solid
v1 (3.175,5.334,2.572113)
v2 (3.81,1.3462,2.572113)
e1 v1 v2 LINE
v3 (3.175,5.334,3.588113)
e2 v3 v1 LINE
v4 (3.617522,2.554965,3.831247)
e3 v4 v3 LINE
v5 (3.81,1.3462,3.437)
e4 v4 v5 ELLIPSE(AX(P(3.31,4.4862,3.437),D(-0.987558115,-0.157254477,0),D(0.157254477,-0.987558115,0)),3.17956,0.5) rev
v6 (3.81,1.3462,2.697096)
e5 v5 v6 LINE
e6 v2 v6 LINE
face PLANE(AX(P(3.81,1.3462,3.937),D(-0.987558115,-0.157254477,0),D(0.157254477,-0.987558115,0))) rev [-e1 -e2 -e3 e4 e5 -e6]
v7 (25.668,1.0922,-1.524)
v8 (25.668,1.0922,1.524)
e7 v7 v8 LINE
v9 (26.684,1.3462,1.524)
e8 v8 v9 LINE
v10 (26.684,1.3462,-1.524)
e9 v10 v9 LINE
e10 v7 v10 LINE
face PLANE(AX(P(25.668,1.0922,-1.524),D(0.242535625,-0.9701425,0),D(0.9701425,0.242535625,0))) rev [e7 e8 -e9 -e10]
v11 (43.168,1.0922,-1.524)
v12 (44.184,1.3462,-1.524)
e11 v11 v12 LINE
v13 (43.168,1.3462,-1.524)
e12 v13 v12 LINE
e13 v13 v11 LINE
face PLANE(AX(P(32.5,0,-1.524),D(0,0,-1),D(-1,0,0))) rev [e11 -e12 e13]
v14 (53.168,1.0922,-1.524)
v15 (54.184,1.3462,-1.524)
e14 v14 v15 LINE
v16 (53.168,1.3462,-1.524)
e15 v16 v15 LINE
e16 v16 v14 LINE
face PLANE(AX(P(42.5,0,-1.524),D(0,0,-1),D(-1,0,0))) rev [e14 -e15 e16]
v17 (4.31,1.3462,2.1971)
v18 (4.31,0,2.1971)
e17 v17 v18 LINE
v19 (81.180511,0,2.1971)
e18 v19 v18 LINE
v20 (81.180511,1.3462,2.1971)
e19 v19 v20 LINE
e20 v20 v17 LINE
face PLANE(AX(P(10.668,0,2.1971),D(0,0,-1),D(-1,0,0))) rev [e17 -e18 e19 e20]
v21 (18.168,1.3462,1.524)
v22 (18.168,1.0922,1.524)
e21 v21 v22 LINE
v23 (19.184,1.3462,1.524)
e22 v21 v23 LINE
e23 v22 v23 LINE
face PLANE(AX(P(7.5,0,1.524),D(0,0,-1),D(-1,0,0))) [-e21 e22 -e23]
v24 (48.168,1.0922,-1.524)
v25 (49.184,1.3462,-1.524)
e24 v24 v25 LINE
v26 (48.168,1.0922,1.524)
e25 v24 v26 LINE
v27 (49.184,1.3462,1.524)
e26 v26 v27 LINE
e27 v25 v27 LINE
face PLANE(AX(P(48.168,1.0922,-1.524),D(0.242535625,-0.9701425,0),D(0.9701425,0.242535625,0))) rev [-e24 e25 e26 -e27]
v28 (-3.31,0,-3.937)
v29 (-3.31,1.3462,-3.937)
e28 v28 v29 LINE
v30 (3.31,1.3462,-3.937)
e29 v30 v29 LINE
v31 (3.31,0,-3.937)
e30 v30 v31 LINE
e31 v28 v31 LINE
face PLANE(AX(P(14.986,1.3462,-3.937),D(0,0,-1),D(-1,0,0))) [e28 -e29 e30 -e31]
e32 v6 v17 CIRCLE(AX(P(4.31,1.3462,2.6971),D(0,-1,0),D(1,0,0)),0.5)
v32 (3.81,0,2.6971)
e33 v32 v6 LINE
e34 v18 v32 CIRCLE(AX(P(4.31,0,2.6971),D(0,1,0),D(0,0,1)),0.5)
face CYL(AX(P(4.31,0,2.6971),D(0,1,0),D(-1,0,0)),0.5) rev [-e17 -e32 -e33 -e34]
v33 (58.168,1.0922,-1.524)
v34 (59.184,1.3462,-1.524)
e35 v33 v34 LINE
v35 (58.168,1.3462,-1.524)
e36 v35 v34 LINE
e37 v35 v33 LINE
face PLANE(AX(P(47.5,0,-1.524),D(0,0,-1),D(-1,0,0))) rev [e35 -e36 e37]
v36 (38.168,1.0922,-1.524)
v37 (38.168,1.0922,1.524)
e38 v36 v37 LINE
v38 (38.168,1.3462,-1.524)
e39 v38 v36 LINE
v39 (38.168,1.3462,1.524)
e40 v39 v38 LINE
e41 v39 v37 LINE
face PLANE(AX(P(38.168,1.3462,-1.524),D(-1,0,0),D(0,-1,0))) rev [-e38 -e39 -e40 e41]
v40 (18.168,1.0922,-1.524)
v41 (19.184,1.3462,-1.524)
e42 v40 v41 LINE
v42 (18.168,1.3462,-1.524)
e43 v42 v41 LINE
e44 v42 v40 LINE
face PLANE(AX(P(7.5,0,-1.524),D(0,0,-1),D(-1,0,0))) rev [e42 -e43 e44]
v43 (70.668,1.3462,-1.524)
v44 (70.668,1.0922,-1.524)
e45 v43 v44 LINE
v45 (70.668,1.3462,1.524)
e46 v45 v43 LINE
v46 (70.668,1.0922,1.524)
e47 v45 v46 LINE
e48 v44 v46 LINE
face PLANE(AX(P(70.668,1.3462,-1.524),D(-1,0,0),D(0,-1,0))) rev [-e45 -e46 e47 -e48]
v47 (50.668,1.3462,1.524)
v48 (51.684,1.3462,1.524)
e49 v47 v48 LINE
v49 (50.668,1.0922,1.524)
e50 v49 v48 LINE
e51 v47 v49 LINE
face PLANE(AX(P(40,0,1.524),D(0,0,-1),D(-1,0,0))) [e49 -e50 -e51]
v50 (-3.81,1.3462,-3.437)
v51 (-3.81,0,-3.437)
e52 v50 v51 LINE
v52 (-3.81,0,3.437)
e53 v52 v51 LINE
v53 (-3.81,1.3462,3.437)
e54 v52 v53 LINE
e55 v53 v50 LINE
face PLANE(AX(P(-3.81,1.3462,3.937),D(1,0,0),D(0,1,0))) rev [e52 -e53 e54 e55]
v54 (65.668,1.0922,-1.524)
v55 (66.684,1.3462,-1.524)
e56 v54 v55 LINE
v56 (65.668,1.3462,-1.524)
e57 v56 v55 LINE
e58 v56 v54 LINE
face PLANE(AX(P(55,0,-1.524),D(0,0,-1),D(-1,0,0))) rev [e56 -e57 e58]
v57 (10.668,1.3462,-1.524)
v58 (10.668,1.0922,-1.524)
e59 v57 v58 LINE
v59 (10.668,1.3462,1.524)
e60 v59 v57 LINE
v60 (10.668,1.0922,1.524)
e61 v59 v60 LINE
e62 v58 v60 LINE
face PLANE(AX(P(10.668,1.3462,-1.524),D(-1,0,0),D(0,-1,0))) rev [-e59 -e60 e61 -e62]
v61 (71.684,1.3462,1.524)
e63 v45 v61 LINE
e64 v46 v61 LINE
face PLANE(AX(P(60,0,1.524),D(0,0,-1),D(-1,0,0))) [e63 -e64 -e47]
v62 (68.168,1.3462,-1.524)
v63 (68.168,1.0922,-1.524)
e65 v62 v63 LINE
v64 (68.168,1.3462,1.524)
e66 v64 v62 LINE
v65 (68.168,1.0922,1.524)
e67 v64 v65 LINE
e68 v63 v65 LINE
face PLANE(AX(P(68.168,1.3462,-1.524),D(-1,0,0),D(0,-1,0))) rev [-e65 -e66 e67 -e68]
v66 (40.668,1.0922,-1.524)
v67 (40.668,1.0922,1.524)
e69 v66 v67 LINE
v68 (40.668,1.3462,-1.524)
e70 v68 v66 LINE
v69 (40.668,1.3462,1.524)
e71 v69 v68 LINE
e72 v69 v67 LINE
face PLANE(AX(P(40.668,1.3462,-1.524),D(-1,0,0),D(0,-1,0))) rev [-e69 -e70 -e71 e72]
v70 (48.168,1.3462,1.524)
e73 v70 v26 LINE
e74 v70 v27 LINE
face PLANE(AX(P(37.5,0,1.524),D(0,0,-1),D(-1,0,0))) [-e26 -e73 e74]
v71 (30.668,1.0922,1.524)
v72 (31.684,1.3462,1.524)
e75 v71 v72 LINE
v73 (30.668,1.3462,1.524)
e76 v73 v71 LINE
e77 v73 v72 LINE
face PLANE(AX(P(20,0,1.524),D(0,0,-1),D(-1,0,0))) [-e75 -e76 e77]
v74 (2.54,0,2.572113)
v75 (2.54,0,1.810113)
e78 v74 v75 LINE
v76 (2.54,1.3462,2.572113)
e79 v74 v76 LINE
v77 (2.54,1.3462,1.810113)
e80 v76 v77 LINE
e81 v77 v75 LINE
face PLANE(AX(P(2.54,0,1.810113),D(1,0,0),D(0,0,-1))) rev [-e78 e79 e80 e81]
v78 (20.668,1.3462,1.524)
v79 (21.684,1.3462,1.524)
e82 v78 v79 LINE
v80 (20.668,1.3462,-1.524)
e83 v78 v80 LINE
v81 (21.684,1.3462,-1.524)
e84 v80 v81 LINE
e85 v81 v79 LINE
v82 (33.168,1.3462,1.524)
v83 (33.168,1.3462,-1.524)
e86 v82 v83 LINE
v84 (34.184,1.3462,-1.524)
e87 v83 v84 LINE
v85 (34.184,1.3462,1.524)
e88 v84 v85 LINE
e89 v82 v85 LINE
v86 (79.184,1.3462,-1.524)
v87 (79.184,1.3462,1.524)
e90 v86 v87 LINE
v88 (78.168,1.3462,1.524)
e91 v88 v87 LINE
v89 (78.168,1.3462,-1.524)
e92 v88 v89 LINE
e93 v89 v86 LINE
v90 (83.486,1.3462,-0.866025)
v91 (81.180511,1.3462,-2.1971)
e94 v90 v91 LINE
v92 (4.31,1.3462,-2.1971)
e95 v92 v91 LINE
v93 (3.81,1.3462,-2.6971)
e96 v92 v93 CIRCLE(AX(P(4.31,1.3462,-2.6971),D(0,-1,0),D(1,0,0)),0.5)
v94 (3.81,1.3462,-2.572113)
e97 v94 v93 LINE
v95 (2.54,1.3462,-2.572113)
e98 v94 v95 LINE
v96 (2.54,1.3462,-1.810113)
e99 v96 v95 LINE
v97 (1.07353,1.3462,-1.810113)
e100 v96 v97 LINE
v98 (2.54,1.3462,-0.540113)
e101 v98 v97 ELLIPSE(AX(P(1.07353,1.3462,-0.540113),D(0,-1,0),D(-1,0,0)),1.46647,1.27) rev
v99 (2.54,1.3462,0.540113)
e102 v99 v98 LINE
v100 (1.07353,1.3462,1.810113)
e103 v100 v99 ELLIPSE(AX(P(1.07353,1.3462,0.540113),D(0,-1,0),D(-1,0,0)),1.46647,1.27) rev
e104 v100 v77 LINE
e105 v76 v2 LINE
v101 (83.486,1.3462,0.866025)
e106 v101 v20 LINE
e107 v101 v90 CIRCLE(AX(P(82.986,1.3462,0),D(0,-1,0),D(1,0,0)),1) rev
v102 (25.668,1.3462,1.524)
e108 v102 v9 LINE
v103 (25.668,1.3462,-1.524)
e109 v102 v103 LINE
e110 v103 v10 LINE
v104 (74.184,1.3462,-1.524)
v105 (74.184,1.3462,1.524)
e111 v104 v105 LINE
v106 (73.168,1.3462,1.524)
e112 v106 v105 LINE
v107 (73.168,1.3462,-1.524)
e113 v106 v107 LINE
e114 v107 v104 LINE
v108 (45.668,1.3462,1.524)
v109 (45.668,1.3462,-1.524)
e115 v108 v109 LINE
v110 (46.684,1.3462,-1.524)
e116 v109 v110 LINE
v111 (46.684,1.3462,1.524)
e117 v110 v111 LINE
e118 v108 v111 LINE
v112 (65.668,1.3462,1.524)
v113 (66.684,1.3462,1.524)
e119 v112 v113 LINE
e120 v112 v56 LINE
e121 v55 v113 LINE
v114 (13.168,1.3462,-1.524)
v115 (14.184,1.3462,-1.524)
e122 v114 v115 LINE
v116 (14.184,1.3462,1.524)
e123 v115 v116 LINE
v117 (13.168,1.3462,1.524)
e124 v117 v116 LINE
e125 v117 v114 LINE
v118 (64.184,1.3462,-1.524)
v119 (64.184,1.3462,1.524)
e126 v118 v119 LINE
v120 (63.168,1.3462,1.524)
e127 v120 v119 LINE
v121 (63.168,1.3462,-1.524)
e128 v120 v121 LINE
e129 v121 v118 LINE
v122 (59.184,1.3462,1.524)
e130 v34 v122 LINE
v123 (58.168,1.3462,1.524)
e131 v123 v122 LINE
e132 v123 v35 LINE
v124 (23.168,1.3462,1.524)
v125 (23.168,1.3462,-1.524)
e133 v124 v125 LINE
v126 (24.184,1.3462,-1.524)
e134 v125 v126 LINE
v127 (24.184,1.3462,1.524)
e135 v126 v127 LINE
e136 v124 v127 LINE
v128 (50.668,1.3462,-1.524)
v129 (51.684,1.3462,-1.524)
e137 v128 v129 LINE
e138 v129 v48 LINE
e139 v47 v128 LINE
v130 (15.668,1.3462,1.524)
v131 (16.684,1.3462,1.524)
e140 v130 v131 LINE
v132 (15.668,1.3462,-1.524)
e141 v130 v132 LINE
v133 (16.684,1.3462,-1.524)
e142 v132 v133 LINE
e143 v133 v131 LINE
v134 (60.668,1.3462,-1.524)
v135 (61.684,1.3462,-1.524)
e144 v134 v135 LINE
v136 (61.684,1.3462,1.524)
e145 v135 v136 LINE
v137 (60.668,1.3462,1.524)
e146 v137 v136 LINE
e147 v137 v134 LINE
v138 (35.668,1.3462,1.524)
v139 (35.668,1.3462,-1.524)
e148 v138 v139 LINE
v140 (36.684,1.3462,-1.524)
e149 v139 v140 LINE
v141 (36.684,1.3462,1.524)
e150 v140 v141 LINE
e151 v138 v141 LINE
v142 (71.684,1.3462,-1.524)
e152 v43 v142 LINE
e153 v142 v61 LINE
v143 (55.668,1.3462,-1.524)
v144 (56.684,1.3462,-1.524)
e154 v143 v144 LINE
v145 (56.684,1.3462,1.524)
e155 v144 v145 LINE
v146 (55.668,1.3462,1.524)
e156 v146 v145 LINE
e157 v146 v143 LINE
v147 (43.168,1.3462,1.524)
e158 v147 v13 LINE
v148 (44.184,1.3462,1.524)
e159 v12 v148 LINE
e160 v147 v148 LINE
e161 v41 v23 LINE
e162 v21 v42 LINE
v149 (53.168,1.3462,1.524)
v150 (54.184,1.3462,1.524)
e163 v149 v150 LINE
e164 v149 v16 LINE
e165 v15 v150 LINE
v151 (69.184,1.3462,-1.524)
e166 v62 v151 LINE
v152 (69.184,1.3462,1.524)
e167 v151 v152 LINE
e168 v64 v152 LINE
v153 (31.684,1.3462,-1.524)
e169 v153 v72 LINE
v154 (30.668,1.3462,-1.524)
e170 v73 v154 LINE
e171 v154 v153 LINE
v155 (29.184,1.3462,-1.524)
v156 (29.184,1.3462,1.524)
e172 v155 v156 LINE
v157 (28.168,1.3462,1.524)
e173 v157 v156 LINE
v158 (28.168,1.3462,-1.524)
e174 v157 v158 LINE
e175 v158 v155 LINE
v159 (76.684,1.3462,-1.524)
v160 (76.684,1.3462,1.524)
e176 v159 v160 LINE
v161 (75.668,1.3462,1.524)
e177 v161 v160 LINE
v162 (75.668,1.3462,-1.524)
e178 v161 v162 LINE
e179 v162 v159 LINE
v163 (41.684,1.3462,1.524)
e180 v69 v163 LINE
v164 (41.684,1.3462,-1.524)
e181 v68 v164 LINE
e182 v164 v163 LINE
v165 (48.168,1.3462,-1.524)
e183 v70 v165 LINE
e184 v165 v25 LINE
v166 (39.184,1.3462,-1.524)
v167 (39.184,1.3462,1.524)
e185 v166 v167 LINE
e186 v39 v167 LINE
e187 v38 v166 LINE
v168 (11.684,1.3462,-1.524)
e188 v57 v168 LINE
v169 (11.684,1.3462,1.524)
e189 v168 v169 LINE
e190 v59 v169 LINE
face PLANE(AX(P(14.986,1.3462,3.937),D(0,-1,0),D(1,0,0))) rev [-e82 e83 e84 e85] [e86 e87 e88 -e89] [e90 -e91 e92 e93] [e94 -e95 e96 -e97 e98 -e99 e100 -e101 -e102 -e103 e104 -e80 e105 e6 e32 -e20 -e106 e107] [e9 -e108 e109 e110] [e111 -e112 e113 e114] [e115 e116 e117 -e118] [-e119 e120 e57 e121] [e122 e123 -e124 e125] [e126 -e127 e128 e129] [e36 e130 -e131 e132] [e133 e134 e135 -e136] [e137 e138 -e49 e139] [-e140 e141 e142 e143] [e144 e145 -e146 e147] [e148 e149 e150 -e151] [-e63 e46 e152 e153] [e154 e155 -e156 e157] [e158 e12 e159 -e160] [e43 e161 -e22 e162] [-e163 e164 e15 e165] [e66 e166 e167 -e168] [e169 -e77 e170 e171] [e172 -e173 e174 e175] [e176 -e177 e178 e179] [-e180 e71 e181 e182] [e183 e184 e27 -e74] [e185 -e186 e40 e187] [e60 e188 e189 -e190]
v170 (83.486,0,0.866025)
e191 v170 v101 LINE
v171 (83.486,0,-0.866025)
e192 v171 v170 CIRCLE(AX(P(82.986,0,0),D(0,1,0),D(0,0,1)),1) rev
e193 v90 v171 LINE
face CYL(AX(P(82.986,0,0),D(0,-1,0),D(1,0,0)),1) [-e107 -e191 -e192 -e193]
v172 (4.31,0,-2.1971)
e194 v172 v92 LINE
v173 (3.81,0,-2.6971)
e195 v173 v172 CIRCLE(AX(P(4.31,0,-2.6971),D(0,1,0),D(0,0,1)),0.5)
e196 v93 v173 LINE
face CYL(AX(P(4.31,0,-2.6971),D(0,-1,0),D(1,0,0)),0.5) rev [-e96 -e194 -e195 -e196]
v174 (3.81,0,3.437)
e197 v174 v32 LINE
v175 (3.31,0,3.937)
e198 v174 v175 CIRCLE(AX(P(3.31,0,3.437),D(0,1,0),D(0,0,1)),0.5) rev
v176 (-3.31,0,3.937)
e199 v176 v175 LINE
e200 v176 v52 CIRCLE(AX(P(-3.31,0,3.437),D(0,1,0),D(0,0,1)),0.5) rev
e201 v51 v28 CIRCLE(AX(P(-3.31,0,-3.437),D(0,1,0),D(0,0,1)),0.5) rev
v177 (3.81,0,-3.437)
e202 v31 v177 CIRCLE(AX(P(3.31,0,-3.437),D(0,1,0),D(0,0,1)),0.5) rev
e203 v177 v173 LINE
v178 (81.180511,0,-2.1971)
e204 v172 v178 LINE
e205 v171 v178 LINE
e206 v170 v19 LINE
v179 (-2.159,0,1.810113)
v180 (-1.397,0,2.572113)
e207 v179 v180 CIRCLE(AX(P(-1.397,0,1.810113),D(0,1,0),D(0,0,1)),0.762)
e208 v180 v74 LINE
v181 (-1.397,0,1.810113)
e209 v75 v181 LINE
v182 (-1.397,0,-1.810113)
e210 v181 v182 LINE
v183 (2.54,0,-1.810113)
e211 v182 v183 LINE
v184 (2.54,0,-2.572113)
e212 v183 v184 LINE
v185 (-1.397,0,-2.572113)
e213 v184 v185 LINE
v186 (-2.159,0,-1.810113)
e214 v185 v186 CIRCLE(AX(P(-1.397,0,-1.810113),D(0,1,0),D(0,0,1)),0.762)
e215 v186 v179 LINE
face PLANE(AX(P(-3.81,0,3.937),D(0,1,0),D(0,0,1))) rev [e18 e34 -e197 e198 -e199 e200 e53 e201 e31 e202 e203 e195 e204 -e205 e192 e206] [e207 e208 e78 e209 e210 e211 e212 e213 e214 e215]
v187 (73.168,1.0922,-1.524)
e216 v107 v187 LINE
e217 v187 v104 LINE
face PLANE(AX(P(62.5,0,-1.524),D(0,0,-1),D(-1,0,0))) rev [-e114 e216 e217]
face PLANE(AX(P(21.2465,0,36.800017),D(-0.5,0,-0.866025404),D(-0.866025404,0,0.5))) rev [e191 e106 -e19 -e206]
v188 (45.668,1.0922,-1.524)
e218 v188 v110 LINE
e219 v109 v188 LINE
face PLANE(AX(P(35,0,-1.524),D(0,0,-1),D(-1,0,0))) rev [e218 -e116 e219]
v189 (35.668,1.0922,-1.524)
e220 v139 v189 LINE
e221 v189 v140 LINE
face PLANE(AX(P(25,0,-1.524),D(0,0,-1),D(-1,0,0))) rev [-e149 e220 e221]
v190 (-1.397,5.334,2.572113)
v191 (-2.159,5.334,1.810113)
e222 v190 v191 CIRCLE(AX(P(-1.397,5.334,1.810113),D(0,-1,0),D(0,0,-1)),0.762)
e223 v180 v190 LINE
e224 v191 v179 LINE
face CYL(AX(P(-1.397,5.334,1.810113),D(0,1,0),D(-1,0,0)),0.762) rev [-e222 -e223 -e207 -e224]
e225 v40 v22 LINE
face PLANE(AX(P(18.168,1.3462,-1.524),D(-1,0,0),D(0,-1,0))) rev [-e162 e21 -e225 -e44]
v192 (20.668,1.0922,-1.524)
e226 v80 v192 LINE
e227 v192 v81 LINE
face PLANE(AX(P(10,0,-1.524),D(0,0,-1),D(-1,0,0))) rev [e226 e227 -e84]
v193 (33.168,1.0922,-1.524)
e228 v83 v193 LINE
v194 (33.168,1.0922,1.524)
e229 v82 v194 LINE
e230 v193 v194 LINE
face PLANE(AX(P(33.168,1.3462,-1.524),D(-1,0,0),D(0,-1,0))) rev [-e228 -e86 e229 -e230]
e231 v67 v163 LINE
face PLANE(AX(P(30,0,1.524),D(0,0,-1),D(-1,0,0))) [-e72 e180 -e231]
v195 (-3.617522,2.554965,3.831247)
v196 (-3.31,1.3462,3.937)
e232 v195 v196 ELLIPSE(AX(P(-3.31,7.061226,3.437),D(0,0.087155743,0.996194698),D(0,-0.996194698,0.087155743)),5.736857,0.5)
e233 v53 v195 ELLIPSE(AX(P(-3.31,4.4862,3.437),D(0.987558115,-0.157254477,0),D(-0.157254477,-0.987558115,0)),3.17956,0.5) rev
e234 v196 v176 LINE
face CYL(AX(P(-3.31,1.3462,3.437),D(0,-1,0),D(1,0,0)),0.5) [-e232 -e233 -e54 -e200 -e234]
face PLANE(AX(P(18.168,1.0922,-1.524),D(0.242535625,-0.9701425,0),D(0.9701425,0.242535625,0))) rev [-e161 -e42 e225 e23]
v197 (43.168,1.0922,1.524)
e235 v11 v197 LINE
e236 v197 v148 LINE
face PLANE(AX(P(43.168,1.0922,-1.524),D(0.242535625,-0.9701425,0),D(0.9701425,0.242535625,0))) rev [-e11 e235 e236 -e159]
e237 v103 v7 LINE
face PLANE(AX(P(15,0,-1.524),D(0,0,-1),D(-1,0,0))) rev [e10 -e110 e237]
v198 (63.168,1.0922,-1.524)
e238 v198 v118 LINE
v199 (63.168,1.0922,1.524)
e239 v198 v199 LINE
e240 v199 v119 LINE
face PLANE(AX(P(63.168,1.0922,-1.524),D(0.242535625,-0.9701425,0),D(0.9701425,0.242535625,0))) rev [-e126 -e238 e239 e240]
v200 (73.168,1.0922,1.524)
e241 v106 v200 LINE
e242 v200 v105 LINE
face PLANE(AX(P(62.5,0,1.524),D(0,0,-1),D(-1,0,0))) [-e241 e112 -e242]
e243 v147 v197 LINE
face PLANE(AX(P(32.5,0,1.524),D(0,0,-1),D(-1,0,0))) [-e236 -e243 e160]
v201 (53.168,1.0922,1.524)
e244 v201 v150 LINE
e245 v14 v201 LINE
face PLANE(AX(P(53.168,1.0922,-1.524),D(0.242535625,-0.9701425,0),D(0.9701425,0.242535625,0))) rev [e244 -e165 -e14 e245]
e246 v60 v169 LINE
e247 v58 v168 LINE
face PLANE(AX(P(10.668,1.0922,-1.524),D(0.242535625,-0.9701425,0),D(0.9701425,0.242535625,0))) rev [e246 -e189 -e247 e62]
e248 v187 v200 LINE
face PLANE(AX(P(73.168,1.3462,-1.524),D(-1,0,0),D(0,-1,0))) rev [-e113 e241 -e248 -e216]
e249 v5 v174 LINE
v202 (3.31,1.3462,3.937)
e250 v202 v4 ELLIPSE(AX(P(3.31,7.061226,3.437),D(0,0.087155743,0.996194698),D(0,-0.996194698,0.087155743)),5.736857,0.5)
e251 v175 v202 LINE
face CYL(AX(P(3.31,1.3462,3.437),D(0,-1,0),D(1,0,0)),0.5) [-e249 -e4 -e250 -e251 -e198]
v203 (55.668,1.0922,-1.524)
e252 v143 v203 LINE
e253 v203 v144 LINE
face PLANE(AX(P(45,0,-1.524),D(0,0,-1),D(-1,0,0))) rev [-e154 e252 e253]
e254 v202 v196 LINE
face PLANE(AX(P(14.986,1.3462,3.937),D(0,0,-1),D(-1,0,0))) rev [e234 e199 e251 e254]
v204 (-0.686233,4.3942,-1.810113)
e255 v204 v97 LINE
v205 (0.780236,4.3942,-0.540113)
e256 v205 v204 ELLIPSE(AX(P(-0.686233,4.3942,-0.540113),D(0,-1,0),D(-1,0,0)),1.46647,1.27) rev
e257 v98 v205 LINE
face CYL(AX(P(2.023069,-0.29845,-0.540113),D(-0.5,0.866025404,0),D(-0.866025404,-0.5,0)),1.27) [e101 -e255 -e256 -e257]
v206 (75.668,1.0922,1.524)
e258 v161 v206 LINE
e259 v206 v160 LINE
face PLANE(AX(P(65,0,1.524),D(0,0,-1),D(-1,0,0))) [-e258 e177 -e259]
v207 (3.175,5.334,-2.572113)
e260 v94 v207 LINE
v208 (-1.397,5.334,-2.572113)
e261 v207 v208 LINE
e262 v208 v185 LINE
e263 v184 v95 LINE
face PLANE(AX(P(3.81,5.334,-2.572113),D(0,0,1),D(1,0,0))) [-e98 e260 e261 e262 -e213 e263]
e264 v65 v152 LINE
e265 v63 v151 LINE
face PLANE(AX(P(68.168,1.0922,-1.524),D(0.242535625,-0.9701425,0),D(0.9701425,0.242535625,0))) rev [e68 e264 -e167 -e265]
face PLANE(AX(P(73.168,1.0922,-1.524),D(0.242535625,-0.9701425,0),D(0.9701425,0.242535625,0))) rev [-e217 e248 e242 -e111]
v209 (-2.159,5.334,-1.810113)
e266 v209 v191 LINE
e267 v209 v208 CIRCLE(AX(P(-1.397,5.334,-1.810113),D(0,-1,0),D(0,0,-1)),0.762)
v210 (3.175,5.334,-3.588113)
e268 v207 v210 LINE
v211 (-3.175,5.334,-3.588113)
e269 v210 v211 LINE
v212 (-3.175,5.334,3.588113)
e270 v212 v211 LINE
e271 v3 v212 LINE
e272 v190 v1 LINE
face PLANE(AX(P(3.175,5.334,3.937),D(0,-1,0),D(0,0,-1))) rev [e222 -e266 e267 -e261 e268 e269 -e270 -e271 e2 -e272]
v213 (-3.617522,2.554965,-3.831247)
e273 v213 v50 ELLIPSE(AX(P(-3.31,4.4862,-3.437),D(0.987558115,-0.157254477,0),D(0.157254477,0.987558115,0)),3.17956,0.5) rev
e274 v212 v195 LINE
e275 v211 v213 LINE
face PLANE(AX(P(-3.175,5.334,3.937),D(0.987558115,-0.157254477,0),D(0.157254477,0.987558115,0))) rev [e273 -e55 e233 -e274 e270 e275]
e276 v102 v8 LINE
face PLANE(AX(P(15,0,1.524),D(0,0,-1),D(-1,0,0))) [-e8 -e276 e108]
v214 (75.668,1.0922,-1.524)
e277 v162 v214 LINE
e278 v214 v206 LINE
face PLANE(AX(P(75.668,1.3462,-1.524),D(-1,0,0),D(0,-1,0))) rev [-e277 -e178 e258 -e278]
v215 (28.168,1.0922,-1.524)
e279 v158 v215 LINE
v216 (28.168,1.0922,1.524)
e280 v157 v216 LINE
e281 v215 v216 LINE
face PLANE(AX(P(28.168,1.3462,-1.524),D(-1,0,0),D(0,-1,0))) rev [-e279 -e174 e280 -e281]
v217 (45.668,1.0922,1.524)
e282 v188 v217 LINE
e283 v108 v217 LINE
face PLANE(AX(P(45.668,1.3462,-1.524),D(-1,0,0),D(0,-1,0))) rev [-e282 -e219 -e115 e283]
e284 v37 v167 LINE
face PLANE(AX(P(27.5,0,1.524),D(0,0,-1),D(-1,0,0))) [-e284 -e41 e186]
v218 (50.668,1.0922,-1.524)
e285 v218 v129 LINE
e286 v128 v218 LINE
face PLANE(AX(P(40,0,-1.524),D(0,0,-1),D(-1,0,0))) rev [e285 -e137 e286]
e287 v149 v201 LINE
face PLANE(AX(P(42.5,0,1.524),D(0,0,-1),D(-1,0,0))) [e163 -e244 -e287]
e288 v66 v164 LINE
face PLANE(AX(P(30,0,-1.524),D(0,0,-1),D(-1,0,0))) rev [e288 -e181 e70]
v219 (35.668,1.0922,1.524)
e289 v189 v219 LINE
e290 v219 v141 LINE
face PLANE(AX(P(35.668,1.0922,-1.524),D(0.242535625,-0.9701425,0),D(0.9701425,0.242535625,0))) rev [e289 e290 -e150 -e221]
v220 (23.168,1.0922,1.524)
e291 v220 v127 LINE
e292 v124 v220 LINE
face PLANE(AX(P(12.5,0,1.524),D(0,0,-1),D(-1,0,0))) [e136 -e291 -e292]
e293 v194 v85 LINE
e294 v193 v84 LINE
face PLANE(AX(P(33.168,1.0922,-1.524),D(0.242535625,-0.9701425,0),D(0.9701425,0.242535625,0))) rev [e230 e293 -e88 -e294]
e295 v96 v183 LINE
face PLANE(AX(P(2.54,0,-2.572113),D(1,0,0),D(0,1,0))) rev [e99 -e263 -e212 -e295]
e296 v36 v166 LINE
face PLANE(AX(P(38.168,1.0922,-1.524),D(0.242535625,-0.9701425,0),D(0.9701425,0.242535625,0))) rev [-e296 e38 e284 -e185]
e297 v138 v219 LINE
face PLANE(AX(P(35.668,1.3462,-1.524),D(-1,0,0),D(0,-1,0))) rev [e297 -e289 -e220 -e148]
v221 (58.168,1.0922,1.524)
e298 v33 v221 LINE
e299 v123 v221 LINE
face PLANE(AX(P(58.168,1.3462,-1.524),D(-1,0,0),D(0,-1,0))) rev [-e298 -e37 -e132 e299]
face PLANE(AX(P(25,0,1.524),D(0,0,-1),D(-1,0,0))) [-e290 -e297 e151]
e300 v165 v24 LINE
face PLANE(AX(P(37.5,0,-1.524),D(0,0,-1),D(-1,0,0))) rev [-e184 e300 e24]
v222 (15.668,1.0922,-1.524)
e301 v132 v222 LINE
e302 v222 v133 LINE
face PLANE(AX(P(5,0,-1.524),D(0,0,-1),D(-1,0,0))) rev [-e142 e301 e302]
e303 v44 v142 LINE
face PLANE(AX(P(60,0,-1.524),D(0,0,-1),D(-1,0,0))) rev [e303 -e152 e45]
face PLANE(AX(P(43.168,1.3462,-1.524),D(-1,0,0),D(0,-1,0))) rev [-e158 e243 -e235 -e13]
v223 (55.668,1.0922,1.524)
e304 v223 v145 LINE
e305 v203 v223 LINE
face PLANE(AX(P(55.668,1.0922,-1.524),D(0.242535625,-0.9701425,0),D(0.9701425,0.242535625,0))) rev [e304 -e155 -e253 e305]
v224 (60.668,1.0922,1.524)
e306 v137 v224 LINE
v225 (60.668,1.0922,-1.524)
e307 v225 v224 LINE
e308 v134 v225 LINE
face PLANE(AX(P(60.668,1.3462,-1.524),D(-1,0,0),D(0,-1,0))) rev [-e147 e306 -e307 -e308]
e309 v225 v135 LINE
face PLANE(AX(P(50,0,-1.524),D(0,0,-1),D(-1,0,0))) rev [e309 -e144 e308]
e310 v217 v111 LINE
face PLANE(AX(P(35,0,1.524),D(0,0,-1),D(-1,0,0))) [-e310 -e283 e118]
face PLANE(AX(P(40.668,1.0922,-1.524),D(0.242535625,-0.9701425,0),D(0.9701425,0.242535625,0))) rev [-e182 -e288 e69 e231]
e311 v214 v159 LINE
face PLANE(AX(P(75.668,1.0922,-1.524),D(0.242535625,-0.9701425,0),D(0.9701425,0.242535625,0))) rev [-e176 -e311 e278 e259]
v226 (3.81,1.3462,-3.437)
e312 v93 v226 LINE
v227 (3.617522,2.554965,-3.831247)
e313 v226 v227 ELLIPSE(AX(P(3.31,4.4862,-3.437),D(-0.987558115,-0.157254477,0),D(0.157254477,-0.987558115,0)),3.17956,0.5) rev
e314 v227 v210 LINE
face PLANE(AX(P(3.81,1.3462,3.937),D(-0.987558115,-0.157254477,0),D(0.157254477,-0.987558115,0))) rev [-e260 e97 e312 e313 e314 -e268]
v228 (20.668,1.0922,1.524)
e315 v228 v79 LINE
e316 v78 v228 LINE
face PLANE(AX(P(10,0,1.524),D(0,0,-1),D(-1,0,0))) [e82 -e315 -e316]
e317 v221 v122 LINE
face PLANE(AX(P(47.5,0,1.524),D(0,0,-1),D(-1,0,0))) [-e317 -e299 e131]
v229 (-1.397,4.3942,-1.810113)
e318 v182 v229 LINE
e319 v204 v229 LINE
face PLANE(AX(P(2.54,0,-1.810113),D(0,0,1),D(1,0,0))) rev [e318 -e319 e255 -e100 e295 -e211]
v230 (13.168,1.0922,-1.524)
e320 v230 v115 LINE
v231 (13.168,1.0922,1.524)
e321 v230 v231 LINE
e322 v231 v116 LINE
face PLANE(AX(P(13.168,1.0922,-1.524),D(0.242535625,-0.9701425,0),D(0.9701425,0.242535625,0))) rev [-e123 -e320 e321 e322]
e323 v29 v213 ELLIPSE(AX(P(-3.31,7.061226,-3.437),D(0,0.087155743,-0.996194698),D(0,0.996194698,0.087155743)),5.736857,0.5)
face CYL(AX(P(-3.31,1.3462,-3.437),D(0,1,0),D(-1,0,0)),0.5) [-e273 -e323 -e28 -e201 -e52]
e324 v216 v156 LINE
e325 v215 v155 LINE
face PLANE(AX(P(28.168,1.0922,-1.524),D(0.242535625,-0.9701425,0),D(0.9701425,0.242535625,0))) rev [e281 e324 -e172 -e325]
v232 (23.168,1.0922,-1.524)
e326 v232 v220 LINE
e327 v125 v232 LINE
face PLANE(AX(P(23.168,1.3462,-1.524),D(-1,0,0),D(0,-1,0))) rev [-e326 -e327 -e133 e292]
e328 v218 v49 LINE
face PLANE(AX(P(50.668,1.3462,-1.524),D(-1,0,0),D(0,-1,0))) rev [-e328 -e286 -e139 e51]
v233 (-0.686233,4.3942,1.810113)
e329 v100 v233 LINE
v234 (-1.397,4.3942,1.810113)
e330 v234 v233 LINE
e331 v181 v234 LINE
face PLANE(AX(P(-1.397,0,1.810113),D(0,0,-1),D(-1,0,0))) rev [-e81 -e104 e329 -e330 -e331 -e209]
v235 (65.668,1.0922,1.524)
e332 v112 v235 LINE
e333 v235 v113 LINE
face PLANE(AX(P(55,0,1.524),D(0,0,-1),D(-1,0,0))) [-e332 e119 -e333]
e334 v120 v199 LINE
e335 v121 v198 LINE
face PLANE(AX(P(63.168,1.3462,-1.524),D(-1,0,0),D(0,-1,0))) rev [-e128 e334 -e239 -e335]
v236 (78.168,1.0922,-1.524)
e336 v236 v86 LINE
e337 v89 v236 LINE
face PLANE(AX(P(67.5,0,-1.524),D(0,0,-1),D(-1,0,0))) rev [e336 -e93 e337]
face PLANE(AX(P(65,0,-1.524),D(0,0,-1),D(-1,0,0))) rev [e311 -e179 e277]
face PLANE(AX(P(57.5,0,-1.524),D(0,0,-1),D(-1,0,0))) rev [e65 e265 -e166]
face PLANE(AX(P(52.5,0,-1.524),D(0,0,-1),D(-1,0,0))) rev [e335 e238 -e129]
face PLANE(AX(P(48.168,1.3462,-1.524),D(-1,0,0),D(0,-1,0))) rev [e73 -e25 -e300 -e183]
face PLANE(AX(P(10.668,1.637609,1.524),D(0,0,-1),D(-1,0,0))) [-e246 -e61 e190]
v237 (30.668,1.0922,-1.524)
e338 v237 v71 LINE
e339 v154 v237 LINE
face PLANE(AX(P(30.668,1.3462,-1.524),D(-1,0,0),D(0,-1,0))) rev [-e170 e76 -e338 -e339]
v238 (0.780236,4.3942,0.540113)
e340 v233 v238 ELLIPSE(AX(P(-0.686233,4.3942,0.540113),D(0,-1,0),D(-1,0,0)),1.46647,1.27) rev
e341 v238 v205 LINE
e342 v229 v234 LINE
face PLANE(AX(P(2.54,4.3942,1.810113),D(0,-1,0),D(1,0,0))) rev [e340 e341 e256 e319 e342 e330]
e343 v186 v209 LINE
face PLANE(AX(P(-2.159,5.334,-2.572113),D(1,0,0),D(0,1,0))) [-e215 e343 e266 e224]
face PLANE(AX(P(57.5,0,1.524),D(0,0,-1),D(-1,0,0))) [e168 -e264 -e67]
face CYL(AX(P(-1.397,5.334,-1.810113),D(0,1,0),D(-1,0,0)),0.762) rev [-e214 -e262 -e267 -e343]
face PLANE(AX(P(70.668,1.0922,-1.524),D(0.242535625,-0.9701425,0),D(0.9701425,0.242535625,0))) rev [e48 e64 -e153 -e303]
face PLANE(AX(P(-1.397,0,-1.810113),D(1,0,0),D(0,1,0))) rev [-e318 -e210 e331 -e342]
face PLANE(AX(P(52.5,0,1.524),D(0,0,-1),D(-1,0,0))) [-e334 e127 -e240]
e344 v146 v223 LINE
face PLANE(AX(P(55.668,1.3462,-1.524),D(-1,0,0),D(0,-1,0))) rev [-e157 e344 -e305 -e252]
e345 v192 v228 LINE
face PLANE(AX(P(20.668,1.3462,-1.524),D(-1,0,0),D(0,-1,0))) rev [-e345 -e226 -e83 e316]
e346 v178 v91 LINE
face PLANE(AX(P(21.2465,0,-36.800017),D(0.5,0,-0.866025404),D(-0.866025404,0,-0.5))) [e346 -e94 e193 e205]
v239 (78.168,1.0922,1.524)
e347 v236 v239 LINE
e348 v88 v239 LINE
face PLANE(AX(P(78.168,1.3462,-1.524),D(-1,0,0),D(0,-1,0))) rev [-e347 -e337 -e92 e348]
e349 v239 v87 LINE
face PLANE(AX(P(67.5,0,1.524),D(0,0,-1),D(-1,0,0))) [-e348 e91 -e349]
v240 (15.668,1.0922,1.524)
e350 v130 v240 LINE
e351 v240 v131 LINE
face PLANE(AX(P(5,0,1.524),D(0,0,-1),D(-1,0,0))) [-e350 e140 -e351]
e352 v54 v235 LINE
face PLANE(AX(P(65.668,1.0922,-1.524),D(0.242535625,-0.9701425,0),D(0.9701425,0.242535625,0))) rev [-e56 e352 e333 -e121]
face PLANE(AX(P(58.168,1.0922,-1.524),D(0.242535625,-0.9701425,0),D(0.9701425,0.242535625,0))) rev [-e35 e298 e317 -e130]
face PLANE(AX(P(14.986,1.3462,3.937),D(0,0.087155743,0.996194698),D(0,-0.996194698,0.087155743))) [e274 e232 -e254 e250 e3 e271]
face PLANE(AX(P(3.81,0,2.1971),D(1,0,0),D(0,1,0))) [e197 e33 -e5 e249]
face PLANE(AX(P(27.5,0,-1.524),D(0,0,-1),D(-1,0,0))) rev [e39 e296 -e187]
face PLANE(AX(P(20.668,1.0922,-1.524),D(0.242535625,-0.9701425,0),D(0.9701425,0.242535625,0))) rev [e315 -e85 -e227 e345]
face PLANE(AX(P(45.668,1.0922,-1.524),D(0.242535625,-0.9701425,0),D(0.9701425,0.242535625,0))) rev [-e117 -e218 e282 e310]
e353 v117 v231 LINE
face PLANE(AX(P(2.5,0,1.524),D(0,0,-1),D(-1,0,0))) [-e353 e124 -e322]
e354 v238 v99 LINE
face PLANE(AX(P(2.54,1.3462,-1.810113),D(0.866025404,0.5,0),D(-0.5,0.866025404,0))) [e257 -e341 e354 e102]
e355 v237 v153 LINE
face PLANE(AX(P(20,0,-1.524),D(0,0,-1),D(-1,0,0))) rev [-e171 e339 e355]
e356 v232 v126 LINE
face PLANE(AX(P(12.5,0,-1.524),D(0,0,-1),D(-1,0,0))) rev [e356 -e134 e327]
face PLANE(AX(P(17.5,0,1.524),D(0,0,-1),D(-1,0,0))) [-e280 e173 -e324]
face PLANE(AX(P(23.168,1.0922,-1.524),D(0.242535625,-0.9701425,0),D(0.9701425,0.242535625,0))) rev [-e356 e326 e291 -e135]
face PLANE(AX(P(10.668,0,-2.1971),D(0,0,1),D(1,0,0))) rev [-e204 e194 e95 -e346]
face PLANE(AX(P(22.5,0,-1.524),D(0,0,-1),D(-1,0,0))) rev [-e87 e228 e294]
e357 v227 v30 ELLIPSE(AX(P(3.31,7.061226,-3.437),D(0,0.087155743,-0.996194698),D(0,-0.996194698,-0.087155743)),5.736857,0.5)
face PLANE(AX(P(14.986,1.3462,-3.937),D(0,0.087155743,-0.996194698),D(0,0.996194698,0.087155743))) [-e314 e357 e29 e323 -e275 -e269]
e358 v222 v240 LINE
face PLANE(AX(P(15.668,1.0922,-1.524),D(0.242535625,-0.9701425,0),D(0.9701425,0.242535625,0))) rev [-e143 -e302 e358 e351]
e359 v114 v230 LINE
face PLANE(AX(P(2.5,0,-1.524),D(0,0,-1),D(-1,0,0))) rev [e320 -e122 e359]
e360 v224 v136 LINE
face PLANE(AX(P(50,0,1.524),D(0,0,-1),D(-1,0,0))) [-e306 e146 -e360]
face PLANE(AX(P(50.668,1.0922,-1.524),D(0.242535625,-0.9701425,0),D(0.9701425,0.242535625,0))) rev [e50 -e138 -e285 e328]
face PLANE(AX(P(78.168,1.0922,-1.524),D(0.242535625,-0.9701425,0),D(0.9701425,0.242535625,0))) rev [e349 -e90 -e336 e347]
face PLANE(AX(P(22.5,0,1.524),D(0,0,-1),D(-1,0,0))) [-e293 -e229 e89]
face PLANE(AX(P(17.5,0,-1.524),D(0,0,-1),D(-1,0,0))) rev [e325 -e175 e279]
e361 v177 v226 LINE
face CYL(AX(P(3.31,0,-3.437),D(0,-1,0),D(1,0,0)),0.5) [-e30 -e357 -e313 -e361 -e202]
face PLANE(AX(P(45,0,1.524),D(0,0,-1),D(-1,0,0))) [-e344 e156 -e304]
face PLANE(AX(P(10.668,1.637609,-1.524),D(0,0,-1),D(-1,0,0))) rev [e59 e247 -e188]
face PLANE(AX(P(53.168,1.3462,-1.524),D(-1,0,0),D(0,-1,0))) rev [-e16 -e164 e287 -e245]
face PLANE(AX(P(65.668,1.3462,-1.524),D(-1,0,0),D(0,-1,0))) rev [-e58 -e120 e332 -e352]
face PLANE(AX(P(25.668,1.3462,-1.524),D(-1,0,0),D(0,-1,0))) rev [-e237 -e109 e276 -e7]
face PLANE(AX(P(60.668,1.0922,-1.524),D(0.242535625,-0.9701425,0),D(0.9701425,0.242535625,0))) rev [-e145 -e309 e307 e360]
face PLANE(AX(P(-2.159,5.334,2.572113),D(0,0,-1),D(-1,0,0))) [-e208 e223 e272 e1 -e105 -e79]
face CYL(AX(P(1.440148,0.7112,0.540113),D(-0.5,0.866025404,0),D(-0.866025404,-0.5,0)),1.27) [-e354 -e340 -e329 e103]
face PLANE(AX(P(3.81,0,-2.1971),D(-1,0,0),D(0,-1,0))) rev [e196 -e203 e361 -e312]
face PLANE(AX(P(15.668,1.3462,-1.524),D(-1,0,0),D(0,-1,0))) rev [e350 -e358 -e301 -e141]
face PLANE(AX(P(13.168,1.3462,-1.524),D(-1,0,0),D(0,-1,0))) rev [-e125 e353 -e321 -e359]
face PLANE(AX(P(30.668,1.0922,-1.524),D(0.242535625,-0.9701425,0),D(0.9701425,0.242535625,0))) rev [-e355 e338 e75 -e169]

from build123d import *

# Parameters (mm, degrees)
EXTRUDE1_DEPTH      = 3.937
DRAFT1_START        = -3.81
DRAFT1_DEPTH        = 7.62
SKETCH3_W           = 5.969
SKETCH3_H           = 5.144225416
CUT_EXTRUDE1_DEPTH  = 16.999459798
CUT_EXTRUDE2_DEPTH  = 16.999459798
SKETCH5_W           = 3.937
SKETCH5_H           = 3.620225416
EXTRUDE2_DEPTH      = 3.048
DRAFT2_ANGLE        = 30
FILLET1_R           = 1.27
FILLET2_R           = 0.762
SKETCH6_W           = 3.937
SKETCH6_H           = 3.620225416
EXTRUDE3_DEPTH      = 1.3462
CUT_EXTRUDE3_DEPTH  = 16.999459798
SKETCH12_W          = 4.3942
SKETCH12_H          = 1.3462
BOSS_EXTRUDE1_DEPTH = 70
CUT_EXTRUDE8_DEPTH  = 1.524
LPATTERN1_START     = -1.524
LPATTERN1_DEPTH     = 3.048
CUT_EXTRUDE9_DEPTH  = 86.170550743
FILLET3_R           = 1
CUT_EXTRUDE10_DEPTH = 85.172743295
FILLET4_R           = 0.5


# Read off the part's stored shape, not the designer's step: Draft1, LPattern1
with BuildPart() as part:
    # Sketch1 → Extrude1 (new, symmetric)
    with BuildSketch(Plane.XY):
        Polygon((3.81, 1.3462), (3.175, 5.334), (-3.175, 5.334), (-3.81, 1.3462), (-3.81, 0), (14.986, 0), (14.986, 1.3462), align=None)
    extrude(amount=EXTRUDE1_DEPTH, both=True)

    # Draft1 outline → Draft1 (cut)
    with BuildSketch(Plane.YZ.offset(DRAFT1_START)):
        Polygon((1.3462, 3.937), (5.334, 3.588112708), (5.334, 3.937), align=None)
        Polygon((5.334, -3.588112708), (1.3462, -3.937), (5.334, -3.937), align=None)
    extrude(amount=DRAFT1_DEPTH, mode=Mode.SUBTRACT)

    # Sketch3 → Cut-Extrude1 (cut, through all)
    with BuildSketch(Plane(origin=(0, 1.3462, 0), x_dir=(-1, 0, 0), z_dir=(0, 1, 0))):
        with Locations((-0.8255, 0)):
            Rectangle(SKETCH3_W, SKETCH3_H)
    extrude(amount=CUT_EXTRUDE1_DEPTH, mode=Mode.SUBTRACT)

    # Sketch4 → Cut-Extrude2 (cut, through all)
    with BuildSketch(Plane(origin=(0, 1.3462, 0), x_dir=(-1, 0, 0), z_dir=(0, 1, 0))):
        Polygon((2.159, 2.572112708), (-2.54, 2.572112708), (-2.54, 1.810112708), (1.397, 1.810112708), (1.397, -1.810112708), (-2.54, -1.810112708), (-2.54, -2.572112708), (2.159, -2.572112708), align=None)
    extrude(amount=-CUT_EXTRUDE2_DEPTH, mode=Mode.SUBTRACT)

    # Sketch5 → Extrude2 (add)
    with BuildSketch(Plane(origin=(0, 1.3462, 0), x_dir=(-1, 0, 0), z_dir=(0, 1, 0))):
        with Locations((-0.5715, 0)):
            Rectangle(SKETCH5_W, SKETCH5_H)
    extrude(amount=EXTRUDE2_DEPTH)

    # Draft2
    draft2_faces = [part.faces().sort_by_distance(p)[0] for p in [
        (2.54, 2.8702, 0),
    ]]
    draft(draft2_faces, Plane(origin=(14.986, 1.3462, 3.937), x_dir=(1, 0, 0), z_dir=(0, 1, 0)), DRAFT2_ANGLE)

    # Fillet1
    # the kernel refuses this fillet: 1.27 mm, written as the material it takes off along each edge
    with BuildSketch(Plane(origin=(4.1275, -1.403430657, 1.810112708), x_dir=(-0.866025403784438, -0.500000000000001, 0), z_dir=(-0.500000000000001, 0.866025403784438, 0))) as fillet1_piece_1_section:
        with BuildLine():
            CenterArc((FILLET1_R, -FILLET1_R), FILLET1_R, 90, 90)
            Line((0, -FILLET1_R), (0, 0))
            Line((0, 0), (FILLET1_R, 0))
        make_face()
    fillet1_piece_1 = extrude(amount=9.869527241, mode=Mode.PRIVATE)
    fillet1_piece_1 = split(fillet1_piece_1, bisect_by=Plane(origin=(2.54, 0.912532514, 1.637821639), z_dir=(-1, 0, 0)), keep=Keep.TOP, mode=Mode.PRIVATE)
    add(fillet1_piece_1, mode=Mode.SUBTRACT)
    with BuildSketch(Plane(origin=(4.1275, -1.403430657, -1.810112708), x_dir=(-0.8660254037844382, -0.500000000000001, 0), z_dir=(-0.500000000000001, 0.866025403784438, 0))) as fillet1_piece_2_section:
        with BuildLine():
            CenterArc((FILLET1_R, FILLET1_R), FILLET1_R, 180, 90)
            Line((0, FILLET1_R), (0, 0))
            Line((0, 0), (FILLET1_R, 0))
        make_face()
    fillet1_piece_2 = extrude(amount=9.869527241, mode=Mode.PRIVATE)
    fillet1_piece_2 = split(fillet1_piece_2, bisect_by=Plane(origin=(2.54, 0.912532514, -1.637821639), z_dir=(-1, 0, 0)), keep=Keep.TOP, mode=Mode.PRIVATE)
    add(fillet1_piece_2, mode=Mode.SUBTRACT)

    # Fillet2
    fillet2_edges = [part.edges().sort_by_distance(p)[0] for p in [
        (-2.159, 2.667, 2.572112708),
        (-2.159, 2.667, -2.572112708),
    ]]
    fillet(fillet2_edges, radius=FILLET2_R)

    # Sketch6 → Extrude3 (add)
    with BuildSketch(Plane.XZ):
        with Locations((0.5715, 0)):
            Rectangle(SKETCH6_W, SKETCH6_H)
    extrude(amount=-EXTRUDE3_DEPTH)

    # Sketch7 → Cut-Extrude3 (cut, through all)
    with BuildSketch(Plane(origin=(0, 1.3462, 0), x_dir=(-1, 0, 0), z_dir=(0, 1, 0))):
        Polygon((-14.986, 3.937), (-3.81, 3.937), (-10.668, 2.1971), (-14.986, 2.1971), align=None)
        Polygon((-14.986, -3.937), (-3.81, -3.937), (-10.668, -2.1971), (-14.986, -2.1971), align=None)
    extrude(amount=-CUT_EXTRUDE3_DEPTH, mode=Mode.SUBTRACT)

    # Sketch12 → Boss-Extrude1 (add)
    with BuildSketch(Plane(origin=(14.986, 0, 0), x_dir=(0, 0, -1), z_dir=(1, 0, 0))):
        with Locations((0, 0.6731)):
            Rectangle(SKETCH12_W, SKETCH12_H)
    extrude(amount=BOSS_EXTRUDE1_DEPTH)

    # Sketch11 → Cut-Extrude8 (cut, symmetric)
    with BuildSketch(Plane.XY):
        Polygon((10.668, 1.3462), (10.668, 1.0922), (11.684, 1.3462), (11.684, 1.637608524), (10.668, 1.637608524), align=None)
    extrude(amount=CUT_EXTRUDE8_DEPTH, both=True, mode=Mode.SUBTRACT)

    # LPattern1 outline → LPattern1 (cut)
    with BuildSketch(Plane.XY.offset(LPATTERN1_START)):
        Polygon((14.184, 1.3462), (13.168, 1.3462), (13.168, 1.0922), align=None)
        Polygon((79.184, 1.3462), (78.168, 1.3462), (78.168, 1.0922), align=None)
        Polygon((76.684, 1.3462), (75.668, 1.3462), (75.668, 1.0922), align=None)
        Polygon((74.184, 1.3462), (73.168, 1.3462), (73.168, 1.0922), align=None)
        Polygon((71.684, 1.3462), (70.668, 1.3462), (70.668, 1.0922), align=None)
        Polygon((69.184, 1.3462), (68.168, 1.3462), (68.168, 1.0922), align=None)
        Polygon((66.684, 1.3462), (65.668, 1.3462), (65.668, 1.0922), align=None)
        Polygon((64.184, 1.3462), (63.168, 1.3462), (63.168, 1.0922), align=None)
        Polygon((61.684, 1.3462), (60.668, 1.3462), (60.668, 1.0922), align=None)
        Polygon((59.184, 1.3462), (58.168, 1.3462), (58.168, 1.0922), align=None)
        Polygon((56.684, 1.3462), (55.668, 1.3462), (55.668, 1.0922), align=None)
        Polygon((54.184, 1.3462), (53.168, 1.3462), (53.168, 1.0922), align=None)
        Polygon((51.684, 1.3462), (50.668, 1.3462), (50.668, 1.0922), align=None)
        Polygon((49.184, 1.3462), (48.168, 1.3462), (48.168, 1.0922), align=None)
        Polygon((46.684, 1.3462), (45.668, 1.3462), (45.668, 1.0922), align=None)
        Polygon((44.184, 1.3462), (43.168, 1.3462), (43.168, 1.0922), align=None)
        Polygon((41.684, 1.3462), (40.668, 1.3462), (40.668, 1.0922), align=None)
        Polygon((39.184, 1.3462), (38.168, 1.3462), (38.168, 1.0922), align=None)
        Polygon((36.684, 1.3462), (35.668, 1.3462), (35.668, 1.0922), align=None)
        Polygon((34.184, 1.3462), (33.168, 1.3462), (33.168, 1.0922), align=None)
        Polygon((31.684, 1.3462), (30.668, 1.3462), (30.668, 1.0922), align=None)
        Polygon((29.184, 1.3462), (28.168, 1.3462), (28.168, 1.0922), align=None)
        Polygon((26.684, 1.3462), (25.668, 1.3462), (25.668, 1.0922), align=None)
        Polygon((24.184, 1.3462), (23.168, 1.3462), (23.168, 1.0922), align=None)
        Polygon((21.684, 1.3462), (20.668, 1.3462), (20.668, 1.0922), align=None)
        Polygon((19.184, 1.3462), (18.168, 1.3462), (18.168, 1.0922), align=None)
        Polygon((16.684, 1.3462), (15.668, 1.3462), (15.668, 1.0922), align=None)
    extrude(amount=LPATTERN1_DEPTH, mode=Mode.SUBTRACT)

    # Sketch13 → Cut-Extrude9 (cut, through all)
    with BuildSketch(Plane(origin=(0, 1.3462, 0), x_dir=(1, 0, 0), z_dir=(0, 1, 0))):
        Polygon((84.986, -2.1971), (84.986, 0), (81.180511171, -2.1971), align=None)
        Polygon((81.180511171, 2.1971), (84.986, 0), (84.986, 2.1971), align=None)
    extrude(amount=-CUT_EXTRUDE9_DEPTH, mode=Mode.SUBTRACT)

    # Fillet3
    fillet3_edges = [part.edges().sort_by_distance(p)[0] for p in [
        (84.986, 0.6731, 0),
    ]]
    fillet(fillet3_edges, radius=FILLET3_R)

    # Sketch14 → Cut-Extrude10 (cut, through all)
    with BuildSketch(Plane(origin=(0, 1.3462, 0), x_dir=(1, 0, 0), z_dir=(0, 1, 0))):
        Polygon((10.668, 2.1971), (3.81, 2.1971), (3.81, 3.937), align=None)
    cut_extrude10 = extrude(amount=-CUT_EXTRUDE10_DEPTH, mode=Mode.SUBTRACT)

    # Mirror1: Cut-Extrude10 across plane
    add(cut_extrude10.mirror(Plane.XY), mode=Mode.SUBTRACT)

    # Fillet4
    # the kernel refuses this fillet: 0.5 mm, written as the material it adds along each edge
    with BuildSketch(Plane(origin=(3.81, 1.3462, -2.1971), x_dir=(1, 0, 0), z_dir=(0, -1, 0)), Plane(origin=(3.81, 1.3462, 2.1971), x_dir=(0, 0, 1), z_dir=(0, -1, 0))) as fillet4_piece_1:
        with BuildLine():
            CenterArc((FILLET4_R, -FILLET4_R), FILLET4_R, 90, 90)
            Line((0, -FILLET4_R), (0, 0))
            Line((0, 0), (FILLET4_R, 0))
        make_face()
    extrude(amount=1.3462)
    # the kernel refuses this fillet: 0.5 mm, written as the material it takes off along each edge
    with BuildSketch(Plane(origin=(3.81, 2.5962, 3.937), x_dir=(0, 0, -1), z_dir=(0, -1, 0)), Plane(origin=(-3.81, 2.5962, 3.937), x_dir=(1, 0, 0), z_dir=(0, -1, 0)), Plane(origin=(3.81, 2.5962, -3.937), x_dir=(-1, 0, 0), z_dir=(0, -1, 0)), Plane(origin=(-3.81, 2.5962, -3.937), x_dir=(0, 0, 1), z_dir=(0, -1, 0))) as fillet4_2_piece_1:
        with BuildLine():
            CenterArc((FILLET4_R, -FILLET4_R), FILLET4_R, 90, 90)
            Line((0, -FILLET4_R), (0, 0))
            Line((0, 0), (FILLET4_R, 0))
        make_face()
    extrude(amount=3.8462, mode=Mode.SUBTRACT)


solid = part.part
